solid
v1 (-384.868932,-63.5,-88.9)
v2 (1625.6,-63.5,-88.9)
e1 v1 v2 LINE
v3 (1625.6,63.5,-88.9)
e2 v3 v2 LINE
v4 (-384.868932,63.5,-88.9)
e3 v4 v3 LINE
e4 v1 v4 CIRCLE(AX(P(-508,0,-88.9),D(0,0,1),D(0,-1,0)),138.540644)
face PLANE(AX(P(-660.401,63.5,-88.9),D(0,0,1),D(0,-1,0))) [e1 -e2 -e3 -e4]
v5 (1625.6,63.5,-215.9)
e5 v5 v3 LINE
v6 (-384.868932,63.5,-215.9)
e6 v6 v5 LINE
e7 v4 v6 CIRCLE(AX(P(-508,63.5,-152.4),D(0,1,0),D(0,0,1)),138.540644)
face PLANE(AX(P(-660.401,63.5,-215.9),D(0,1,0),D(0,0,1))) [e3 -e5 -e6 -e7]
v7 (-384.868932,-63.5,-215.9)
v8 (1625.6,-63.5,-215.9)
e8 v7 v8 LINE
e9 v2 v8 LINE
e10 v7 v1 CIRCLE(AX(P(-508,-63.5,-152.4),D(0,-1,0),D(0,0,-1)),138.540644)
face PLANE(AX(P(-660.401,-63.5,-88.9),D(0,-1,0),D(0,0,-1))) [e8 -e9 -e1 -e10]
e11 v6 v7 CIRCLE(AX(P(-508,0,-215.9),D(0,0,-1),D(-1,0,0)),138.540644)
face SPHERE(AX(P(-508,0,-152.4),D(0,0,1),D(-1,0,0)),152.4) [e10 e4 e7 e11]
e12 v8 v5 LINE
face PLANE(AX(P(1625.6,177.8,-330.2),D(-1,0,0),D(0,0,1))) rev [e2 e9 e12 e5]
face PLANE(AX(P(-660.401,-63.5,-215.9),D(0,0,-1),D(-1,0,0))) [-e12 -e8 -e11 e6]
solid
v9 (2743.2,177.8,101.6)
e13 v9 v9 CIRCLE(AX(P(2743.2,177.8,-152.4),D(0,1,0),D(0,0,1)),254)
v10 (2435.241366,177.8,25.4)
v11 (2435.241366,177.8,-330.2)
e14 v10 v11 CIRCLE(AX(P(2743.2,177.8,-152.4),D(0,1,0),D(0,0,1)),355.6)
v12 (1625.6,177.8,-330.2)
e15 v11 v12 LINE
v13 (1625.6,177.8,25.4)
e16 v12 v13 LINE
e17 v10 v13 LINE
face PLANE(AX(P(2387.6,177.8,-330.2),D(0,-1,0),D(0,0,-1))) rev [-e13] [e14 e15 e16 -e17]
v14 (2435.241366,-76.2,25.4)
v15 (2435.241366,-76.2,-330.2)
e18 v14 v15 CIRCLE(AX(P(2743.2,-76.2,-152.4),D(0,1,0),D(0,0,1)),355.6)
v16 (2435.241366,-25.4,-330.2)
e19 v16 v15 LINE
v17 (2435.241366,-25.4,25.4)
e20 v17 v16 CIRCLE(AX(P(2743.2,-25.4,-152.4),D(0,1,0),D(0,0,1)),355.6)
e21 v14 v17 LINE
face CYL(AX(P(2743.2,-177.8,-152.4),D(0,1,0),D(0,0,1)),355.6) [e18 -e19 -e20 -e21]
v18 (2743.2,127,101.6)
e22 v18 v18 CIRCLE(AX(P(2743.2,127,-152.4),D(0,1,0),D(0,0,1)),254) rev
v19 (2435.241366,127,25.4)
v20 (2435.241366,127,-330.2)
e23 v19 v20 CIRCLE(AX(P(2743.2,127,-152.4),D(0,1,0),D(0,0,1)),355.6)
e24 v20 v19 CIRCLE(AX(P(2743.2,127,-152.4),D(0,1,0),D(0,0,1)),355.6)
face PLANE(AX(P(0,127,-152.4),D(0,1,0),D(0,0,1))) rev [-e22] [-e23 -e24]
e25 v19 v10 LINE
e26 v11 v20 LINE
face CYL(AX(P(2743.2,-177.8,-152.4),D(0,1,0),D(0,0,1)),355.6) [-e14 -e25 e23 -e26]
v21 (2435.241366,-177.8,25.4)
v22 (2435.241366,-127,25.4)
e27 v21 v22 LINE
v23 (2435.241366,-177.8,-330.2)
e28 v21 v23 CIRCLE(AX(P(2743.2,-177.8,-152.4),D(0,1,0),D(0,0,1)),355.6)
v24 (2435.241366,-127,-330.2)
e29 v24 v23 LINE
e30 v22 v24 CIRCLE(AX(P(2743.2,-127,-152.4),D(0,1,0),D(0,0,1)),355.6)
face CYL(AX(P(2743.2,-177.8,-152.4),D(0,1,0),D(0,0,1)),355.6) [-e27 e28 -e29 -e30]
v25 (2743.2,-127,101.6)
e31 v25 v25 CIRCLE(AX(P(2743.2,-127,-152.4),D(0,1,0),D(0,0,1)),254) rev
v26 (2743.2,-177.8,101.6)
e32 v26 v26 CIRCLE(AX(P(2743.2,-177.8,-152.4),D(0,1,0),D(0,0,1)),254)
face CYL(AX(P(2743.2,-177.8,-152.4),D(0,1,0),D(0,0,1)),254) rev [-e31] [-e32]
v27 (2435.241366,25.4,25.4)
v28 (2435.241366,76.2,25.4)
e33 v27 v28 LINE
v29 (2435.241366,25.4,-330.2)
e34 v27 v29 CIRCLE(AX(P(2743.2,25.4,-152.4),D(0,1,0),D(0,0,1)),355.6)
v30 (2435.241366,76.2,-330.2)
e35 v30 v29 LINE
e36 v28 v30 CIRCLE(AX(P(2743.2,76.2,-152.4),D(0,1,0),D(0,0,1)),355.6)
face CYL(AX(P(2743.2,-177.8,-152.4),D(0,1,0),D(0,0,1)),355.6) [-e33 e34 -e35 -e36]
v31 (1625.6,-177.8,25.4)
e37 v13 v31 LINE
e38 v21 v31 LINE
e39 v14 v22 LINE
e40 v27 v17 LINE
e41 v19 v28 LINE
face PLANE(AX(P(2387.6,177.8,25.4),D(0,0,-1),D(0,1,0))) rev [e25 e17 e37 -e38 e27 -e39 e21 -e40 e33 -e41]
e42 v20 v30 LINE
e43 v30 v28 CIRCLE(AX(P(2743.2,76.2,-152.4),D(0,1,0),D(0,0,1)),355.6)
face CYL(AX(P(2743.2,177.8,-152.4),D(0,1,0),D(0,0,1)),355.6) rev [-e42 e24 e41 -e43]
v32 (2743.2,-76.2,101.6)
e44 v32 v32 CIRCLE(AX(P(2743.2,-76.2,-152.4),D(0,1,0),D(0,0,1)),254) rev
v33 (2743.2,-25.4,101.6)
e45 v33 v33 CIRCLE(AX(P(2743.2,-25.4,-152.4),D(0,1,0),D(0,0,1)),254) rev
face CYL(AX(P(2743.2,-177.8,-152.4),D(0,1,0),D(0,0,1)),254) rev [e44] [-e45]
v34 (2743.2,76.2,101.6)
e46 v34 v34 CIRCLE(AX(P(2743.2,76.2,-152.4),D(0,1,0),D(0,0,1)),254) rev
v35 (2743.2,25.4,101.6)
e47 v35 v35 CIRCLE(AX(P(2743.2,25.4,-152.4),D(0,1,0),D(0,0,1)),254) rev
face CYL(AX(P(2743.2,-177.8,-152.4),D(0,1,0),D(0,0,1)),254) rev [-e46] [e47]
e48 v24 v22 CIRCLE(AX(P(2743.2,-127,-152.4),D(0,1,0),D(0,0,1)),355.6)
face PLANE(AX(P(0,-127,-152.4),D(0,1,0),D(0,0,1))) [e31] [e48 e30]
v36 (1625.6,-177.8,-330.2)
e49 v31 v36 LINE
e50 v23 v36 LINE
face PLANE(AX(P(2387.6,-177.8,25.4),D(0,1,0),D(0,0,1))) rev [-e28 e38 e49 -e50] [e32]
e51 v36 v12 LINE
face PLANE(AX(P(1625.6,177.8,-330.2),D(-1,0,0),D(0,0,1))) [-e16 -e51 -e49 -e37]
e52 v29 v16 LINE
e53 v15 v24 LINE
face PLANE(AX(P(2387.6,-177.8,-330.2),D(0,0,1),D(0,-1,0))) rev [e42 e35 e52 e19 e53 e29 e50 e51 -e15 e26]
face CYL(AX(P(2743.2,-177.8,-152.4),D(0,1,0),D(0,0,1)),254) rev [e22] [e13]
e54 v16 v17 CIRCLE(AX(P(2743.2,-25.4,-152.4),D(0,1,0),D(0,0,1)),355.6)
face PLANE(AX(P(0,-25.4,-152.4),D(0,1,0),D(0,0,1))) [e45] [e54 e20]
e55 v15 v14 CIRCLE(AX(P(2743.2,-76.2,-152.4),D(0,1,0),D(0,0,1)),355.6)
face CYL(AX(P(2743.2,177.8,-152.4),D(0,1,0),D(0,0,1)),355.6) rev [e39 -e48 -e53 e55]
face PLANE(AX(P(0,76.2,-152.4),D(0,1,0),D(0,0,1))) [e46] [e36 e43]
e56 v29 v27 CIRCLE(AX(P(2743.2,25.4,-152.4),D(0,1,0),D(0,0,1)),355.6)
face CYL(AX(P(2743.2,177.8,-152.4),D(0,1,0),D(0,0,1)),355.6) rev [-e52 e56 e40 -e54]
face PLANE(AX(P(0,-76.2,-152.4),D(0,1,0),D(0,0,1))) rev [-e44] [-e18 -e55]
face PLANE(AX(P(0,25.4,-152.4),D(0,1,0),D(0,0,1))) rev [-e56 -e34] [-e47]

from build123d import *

# Parameters (mm, degrees)
SKETCH5_W                            = 127
SKETCH5_H                            = 127
BOSS_EXTRUDE1_DEPTH                  = 1625.6
BOSS_EXTRUDE1_DIRECTION_2_REACH      = 745.14
BOSS_EXTRUDE1_DIRECTION_2_END_RADIUS = 152.4
SKETCH6_W                            = 355.6
SKETCH6_H                            = 355.6
BOSS_EXTRUDE2_DEPTH                  = 762
SKETCH7_R                            = 355.6
BOSS_EXTRUDE3_DEPTH                  = 355.6
BOSS_EXTRUDE4_REACH                  = 3097.154
BOSS_EXTRUDE4_END_RADIUS             = 355.6
SKETCH8_W                            = 355.6
SKETCH8_H                            = 355.6
SKETCH9_R                            = 254
CUT_EXTRUDE1_DEPTH                   = 355.6
SKETCH11_W                           = 355.6
SKETCH11_H                           = 50.8


with BuildPart() as part:
    # Sketch3 → Revolve1 (revolve)
    with BuildSketch(Plane(origin=(0, 0, 0), x_dir=(1, 0, 0), z_dir=(0, 1, 0))):
        with BuildLine():
            Line((-508, 0), (-508, 304.8))
            ThreePointArc((-508, 304.8), (-355.6, 152.4), (-508, 0))
        make_face()
    revolve(axis=Axis((-508, 0, 0), (0, 0, -1)))

    # Sketch5 → Boss-Extrude1 (add)
    with BuildSketch(Plane(origin=(0, 0, 0), x_dir=(0, 0, -1), z_dir=(1, 0, 0))):
        with Locations((152.4, 0)):
            Rectangle(SKETCH5_W, SKETCH5_H)
    extrude(amount=BOSS_EXTRUDE1_DEPTH)

    # Boss-Extrude1 direction 2: up to this sphere (the profile starts outside it)
    boss_extrude1_direction_2_end = Location((-508, 0, -152.4)) * Sphere(BOSS_EXTRUDE1_DIRECTION_2_END_RADIUS, mode=Mode.PRIVATE)
    # Sketch5 → Boss-Extrude1 direction 2 (add, up to the surface)
    with BuildSketch(Plane(origin=(0, 0, 0), x_dir=(0, 0, -1), z_dir=(1, 0, 0)), mode=Mode.PRIVATE) as boss_extrude1_direction_2_sk1:
        with Locations((152.4, 0)):
            Rectangle(SKETCH5_W, SKETCH5_H)
    boss_extrude1_direction_2_tool1 = extrude(boss_extrude1_direction_2_sk1.sketch, amount=-BOSS_EXTRUDE1_DIRECTION_2_REACH, mode=Mode.PRIVATE) - boss_extrude1_direction_2_end
    add(boss_extrude1_direction_2_tool1.solids().sort_by_distance((0, 0, -152.4))[0])

    # Sketch6 → Boss-Extrude2 (add)
    with BuildSketch(Plane(origin=(1625.6, 0, 0), x_dir=(0, 0, -1), z_dir=(1, 0, 0))):
        with Locations((152.4, 0)):
            Rectangle(SKETCH6_W, SKETCH6_H)
    extrude(amount=BOSS_EXTRUDE2_DEPTH)



with BuildPart() as body_2:
    # Sketch7 → Boss-Extrude3 (new body)
    with BuildSketch(Plane(origin=(0, 177.8, 0), x_dir=(1, 0, 0), z_dir=(0, 1, 0))):
        with Locations((2743.2, 152.4)):
            Circle(SKETCH7_R)
    extrude(amount=-BOSS_EXTRUDE3_DEPTH)


with BuildPart() as part_1:
    add(part.part)

    add(body_2.part)  # Boss-Extrude4 merges body 2
    # Boss-Extrude4: up to this cylinder (the profile starts outside it)
    boss_extrude4_end = Plane(origin=(2743.2, 0, -152.4), z_dir=(0, 1, 0)) * Cylinder(BOSS_EXTRUDE4_END_RADIUS, 6906.508, mode=Mode.PRIVATE)
    # Sketch8 → Boss-Extrude4 (add, up to the surface)
    with BuildSketch(Plane(origin=(2387.6, 0, 0), x_dir=(0, 0, -1), z_dir=(1, 0, 0)), mode=Mode.PRIVATE) as boss_extrude4_sk1:
        with Locations((152.4, 0)):
            Rectangle(SKETCH8_W, SKETCH8_H)
    boss_extrude4_tool1 = extrude(boss_extrude4_sk1.sketch, amount=BOSS_EXTRUDE4_REACH, mode=Mode.PRIVATE) - boss_extrude4_end
    add(boss_extrude4_tool1.solids().sort_by_distance((2387.6, 0, -152.4))[0])
    add(boss_extrude4_tool1.solids().sort_by_distance((2387.6, 0, -152.4))[1])

    # Sketch9 → Cut-Extrude1 (cut)
    with BuildSketch(Plane(origin=(0, 177.8, 0), x_dir=(1, 0, 0), z_dir=(0, 1, 0))):
        with Locations((2743.2, 152.4)):
            Circle(SKETCH9_R)
    extrude(amount=-CUT_EXTRUDE1_DEPTH, mode=Mode.SUBTRACT)

    # Sketch11 → Cut-Revolve1 (revolve, cut)
    with BuildSketch(Plane.XY.offset(-152.4)):
        with Locations((2921, 101.6)):
            Rectangle(SKETCH11_W, SKETCH11_H)
        with Locations((2921, 0)):
            Rectangle(SKETCH11_W, SKETCH11_H)
        with Locations((2921, -101.6)):
            Rectangle(SKETCH11_W, SKETCH11_H)
    revolve(axis=Axis((2743.2, 177.8, -152.4), (0, -1, 0)), mode=Mode.SUBTRACT)


with BuildPart() as body_2_2:
    # Split1: the piece on the far side of the plane
    add(part_1.part)
    split(bisect_by=Plane(origin=(1625.6, 0, 0), x_dir=(0, 0, 1), z_dir=(1, 0, 0)), keep=Keep.BOTTOM)


with BuildPart() as part_2:
    add(part_1.part)

    # Split1
    split(bisect_by=Plane(origin=(1625.6, 0, 0), x_dir=(0, 0, 1), z_dir=(1, 0, 0)), keep=Keep.TOP)


solid = Compound([body_2_2.part, part_2.part])
